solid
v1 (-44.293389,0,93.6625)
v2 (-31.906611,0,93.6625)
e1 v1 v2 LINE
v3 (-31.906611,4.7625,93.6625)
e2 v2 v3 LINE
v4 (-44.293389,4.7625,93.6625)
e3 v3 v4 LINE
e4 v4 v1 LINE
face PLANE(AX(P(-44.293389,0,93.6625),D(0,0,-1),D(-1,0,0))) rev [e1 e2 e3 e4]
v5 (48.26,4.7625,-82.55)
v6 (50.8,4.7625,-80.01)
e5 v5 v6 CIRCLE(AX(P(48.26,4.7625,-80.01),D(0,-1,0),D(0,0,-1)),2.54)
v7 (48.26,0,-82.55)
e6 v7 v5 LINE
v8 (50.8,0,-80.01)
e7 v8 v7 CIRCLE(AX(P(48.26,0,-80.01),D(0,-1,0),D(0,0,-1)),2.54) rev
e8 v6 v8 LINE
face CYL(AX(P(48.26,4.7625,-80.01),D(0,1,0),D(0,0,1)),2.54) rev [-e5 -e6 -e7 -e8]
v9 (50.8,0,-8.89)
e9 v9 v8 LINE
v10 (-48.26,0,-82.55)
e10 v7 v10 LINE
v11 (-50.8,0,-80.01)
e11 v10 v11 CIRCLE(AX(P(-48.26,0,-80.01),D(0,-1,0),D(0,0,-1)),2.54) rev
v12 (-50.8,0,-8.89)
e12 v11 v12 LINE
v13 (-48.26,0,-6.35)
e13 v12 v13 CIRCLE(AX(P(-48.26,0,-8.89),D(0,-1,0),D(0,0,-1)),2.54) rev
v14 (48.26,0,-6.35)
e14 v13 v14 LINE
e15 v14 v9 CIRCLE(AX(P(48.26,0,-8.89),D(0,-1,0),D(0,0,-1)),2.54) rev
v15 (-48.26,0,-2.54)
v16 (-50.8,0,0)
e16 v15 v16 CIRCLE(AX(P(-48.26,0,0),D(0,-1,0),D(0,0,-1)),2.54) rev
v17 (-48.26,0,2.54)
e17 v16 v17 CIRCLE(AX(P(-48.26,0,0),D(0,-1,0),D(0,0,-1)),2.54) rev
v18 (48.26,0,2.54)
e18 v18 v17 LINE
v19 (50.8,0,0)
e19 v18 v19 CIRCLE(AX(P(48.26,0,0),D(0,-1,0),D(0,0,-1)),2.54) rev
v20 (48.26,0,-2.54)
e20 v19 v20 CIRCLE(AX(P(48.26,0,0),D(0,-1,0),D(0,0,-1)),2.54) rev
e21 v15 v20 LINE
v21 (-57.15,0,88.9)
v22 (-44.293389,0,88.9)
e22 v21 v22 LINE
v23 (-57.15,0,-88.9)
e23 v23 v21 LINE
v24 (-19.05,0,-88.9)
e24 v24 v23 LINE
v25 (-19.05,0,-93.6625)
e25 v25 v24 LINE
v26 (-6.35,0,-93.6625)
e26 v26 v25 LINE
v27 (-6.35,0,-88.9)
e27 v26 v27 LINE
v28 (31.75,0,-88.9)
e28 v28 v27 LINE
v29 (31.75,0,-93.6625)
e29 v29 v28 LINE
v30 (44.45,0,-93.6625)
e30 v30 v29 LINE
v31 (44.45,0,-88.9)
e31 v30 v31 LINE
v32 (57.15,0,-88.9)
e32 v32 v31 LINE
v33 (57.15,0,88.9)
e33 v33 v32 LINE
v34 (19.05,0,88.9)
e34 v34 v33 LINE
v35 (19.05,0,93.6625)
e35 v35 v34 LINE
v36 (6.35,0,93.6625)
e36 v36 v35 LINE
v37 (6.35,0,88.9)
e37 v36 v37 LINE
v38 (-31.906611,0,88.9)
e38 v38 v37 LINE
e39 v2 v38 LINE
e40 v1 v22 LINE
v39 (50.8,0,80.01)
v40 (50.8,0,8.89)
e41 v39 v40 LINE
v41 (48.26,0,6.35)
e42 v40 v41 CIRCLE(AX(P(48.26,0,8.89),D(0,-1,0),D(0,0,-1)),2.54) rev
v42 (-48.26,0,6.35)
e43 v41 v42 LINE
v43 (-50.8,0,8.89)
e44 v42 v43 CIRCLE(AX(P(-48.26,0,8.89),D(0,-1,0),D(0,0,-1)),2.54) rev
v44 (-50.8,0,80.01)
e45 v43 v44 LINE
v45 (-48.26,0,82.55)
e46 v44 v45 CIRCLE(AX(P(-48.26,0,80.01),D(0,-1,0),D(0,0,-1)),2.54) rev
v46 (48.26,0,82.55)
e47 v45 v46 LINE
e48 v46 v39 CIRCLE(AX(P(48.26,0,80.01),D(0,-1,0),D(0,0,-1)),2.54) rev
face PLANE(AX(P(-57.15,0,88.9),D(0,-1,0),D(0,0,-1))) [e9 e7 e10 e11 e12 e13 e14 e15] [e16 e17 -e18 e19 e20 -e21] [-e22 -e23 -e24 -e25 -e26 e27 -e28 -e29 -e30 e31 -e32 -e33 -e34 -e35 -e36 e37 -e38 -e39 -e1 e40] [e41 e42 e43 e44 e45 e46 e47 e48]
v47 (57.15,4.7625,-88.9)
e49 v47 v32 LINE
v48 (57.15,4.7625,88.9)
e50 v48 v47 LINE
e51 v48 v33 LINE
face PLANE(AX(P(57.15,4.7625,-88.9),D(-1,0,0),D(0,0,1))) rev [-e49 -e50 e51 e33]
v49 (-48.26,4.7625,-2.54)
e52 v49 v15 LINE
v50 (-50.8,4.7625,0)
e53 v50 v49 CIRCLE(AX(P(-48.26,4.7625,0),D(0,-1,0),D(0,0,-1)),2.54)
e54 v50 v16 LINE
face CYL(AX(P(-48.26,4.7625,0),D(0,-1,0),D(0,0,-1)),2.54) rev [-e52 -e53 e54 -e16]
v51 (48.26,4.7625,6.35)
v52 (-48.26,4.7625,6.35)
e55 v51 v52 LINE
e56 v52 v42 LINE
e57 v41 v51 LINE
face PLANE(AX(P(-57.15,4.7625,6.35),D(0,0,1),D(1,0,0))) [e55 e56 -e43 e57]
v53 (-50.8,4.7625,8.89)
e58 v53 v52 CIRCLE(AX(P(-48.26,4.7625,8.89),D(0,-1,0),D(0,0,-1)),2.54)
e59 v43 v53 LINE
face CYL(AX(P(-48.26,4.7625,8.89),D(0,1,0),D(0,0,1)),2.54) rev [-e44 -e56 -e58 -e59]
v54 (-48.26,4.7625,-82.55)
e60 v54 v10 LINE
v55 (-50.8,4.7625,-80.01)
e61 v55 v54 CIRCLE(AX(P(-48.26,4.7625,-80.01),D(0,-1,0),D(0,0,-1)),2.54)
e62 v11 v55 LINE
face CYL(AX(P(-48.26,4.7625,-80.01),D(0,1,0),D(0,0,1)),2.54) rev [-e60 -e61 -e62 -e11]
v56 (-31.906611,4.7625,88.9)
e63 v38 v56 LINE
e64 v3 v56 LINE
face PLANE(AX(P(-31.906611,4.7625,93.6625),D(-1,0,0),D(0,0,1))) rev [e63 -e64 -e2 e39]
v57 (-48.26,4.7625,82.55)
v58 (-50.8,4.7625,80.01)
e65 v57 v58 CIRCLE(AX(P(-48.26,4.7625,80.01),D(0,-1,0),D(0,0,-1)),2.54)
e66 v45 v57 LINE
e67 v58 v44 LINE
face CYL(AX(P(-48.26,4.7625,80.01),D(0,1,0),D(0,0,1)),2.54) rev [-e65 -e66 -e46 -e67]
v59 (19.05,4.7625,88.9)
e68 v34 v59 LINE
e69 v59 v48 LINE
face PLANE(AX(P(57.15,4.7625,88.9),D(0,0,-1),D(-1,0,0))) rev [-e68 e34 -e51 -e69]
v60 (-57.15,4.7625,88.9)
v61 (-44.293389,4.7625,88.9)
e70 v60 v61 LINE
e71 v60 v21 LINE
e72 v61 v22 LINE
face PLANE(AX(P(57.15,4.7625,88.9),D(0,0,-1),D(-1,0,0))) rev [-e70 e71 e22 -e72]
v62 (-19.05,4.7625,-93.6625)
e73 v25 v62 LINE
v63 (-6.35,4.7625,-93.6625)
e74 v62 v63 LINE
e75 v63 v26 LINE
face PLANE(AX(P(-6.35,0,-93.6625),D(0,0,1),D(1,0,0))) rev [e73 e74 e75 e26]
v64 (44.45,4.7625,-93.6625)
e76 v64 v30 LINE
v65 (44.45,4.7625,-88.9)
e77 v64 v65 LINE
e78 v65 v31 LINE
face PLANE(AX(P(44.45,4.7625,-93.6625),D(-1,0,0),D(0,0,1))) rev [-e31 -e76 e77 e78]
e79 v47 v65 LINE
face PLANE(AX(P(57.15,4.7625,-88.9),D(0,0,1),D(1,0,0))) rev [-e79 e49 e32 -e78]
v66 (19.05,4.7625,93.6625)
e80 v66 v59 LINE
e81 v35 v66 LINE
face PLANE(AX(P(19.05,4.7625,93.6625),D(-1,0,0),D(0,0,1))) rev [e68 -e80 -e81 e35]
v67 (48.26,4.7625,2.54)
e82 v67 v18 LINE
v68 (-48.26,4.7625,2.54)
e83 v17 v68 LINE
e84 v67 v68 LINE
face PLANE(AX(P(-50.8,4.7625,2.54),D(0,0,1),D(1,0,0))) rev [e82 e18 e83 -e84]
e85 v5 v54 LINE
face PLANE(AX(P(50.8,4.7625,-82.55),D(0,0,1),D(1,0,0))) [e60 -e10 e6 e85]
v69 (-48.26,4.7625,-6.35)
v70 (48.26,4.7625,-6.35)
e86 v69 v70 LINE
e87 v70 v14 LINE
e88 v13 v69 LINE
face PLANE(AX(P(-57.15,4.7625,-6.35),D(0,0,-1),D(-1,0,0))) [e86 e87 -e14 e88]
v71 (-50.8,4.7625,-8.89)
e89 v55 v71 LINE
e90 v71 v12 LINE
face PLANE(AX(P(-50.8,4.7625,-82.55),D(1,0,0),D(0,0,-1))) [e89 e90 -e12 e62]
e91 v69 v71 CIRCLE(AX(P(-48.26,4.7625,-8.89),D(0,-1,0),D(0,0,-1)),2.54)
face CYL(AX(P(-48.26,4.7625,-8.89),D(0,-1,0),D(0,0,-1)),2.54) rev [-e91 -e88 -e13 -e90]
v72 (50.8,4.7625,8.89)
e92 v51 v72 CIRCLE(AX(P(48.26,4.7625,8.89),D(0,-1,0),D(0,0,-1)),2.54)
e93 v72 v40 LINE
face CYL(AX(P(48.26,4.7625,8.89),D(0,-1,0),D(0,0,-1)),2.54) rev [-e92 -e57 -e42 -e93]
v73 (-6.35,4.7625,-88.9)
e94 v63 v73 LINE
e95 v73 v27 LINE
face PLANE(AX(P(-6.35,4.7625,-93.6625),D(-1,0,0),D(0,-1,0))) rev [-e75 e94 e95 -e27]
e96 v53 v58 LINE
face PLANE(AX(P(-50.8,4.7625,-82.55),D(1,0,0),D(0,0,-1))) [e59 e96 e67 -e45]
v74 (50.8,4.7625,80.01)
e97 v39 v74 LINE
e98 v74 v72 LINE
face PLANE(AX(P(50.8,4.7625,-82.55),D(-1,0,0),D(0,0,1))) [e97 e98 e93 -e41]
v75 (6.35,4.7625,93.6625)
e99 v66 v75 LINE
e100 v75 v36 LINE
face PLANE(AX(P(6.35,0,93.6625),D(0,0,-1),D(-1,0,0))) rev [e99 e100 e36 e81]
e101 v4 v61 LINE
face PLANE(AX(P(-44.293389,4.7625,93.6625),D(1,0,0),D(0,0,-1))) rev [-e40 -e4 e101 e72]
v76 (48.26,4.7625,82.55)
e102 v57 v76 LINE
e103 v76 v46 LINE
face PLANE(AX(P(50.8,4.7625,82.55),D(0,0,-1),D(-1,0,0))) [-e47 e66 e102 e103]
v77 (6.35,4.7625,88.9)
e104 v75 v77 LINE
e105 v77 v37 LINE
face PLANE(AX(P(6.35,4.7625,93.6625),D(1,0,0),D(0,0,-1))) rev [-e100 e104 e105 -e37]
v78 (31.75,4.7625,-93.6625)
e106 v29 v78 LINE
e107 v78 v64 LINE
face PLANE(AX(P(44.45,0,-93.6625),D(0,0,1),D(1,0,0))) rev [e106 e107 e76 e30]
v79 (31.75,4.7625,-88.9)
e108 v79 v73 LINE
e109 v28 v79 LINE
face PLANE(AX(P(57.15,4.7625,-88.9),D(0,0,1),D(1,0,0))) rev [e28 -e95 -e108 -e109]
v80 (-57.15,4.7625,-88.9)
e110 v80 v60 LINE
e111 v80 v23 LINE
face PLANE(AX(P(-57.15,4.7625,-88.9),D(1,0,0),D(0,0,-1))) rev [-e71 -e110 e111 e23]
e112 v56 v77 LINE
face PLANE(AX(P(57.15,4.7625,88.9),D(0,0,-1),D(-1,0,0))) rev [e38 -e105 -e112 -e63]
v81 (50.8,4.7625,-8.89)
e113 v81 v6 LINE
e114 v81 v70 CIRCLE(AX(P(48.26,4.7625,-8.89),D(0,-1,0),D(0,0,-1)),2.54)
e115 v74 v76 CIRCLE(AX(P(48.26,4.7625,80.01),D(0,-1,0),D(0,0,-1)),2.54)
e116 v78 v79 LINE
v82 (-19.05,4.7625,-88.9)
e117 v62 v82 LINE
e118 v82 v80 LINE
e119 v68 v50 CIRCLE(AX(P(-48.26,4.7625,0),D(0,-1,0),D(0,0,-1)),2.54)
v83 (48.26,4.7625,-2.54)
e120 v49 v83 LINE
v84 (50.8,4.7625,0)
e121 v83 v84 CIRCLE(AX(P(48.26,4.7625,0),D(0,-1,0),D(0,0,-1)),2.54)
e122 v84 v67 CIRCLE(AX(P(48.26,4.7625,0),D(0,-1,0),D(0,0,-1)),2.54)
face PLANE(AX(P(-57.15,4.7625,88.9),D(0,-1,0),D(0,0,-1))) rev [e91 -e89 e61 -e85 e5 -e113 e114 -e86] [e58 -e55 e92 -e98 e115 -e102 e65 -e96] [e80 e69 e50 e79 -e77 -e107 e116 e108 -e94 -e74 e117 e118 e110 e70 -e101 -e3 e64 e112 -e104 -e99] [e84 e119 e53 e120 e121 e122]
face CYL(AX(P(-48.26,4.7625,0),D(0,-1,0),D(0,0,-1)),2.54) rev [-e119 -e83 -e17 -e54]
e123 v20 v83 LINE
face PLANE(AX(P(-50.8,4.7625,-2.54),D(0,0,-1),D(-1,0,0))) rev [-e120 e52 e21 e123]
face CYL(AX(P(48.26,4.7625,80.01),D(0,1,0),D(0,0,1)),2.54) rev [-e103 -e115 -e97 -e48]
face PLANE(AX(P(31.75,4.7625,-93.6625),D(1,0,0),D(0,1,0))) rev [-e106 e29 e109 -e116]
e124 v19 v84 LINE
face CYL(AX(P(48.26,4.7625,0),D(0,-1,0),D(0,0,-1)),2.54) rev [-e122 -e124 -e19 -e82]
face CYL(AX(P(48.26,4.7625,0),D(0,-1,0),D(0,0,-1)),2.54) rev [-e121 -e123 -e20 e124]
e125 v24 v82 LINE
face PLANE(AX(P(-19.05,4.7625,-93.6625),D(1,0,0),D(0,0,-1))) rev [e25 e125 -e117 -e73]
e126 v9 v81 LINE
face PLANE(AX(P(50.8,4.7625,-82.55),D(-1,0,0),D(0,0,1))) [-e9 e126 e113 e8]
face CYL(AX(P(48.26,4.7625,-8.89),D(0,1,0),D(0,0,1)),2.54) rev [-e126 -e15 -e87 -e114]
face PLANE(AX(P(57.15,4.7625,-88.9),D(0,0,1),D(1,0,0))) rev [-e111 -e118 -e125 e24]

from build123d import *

# Parameters (mm, degrees)
SKETCH1_W           = 114.3
SKETCH1_H           = 177.8
SKETCH1_W_2         = 101.6
SKETCH1_H_2         = 165.1
BOSS_EXTRUDE1_DEPTH = 4.7625
SKETCH2_W           = 12.38677804
SKETCH2_H           = 4.7625
SKETCH2_W_2         = 12.7
BOSS_EXTRUDE2_DEPTH = 4.7625
SKETCH3_W           = 12.7
SKETCH3_H           = 4.7625
BOSS_EXTRUDE3_DEPTH = 4.7625
FILLET1_R           = 2.54
SKETCH5_W           = 114.3
SKETCH5_H           = 12.7
SKETCH5_W_2         = 101.6
SKETCH5_H_2         = 5.08
BOSS_EXTRUDE5_DEPTH = 4.7625
FILLET3_R           = 2.54


with BuildPart() as part:
    # Sketch1 → Boss-Extrude1 (new body)
    with BuildSketch(Plane(origin=(0, 0, 0), x_dir=(1, 0, 0), z_dir=(0, 1, 0))):
        Rectangle(SKETCH1_W, SKETCH1_H)
        Rectangle(SKETCH1_W_2, SKETCH1_H_2, mode=Mode.SUBTRACT)
    extrude(amount=BOSS_EXTRUDE1_DEPTH)

    # Sketch2 → Boss-Extrude2 (add)
    with BuildSketch(Plane.XY.offset(88.9)):
        with Locations((-38.1, 2.38125)):
            Rectangle(SKETCH2_W, SKETCH2_H)
        with Locations((12.7, 2.38125)):
            Rectangle(SKETCH2_W_2, SKETCH2_H)
    extrude(amount=BOSS_EXTRUDE2_DEPTH)

    # Sketch3 → Boss-Extrude3 (add)
    with BuildSketch(Plane(origin=(0, 0, -88.9), x_dir=(-1, 0, 0), z_dir=(0, 0, -1))):
        with Locations((-38.1, 2.38125)):
            Rectangle(SKETCH3_W, SKETCH3_H)
        with Locations((12.7, 2.38125)):
            Rectangle(SKETCH3_W, SKETCH3_H)
    extrude(amount=BOSS_EXTRUDE3_DEPTH)

    # Fillet1
    fillet1_edges = [part.edges().sort_by_distance(p)[0] for p in [
        (50.8, 2.38125, 82.55),
        (50.8, 2.38125, -82.55),
        (-50.8, 2.38125, -82.55),
        (-50.8, 2.38125, 82.55),
    ]]
    fillet(fillet1_edges, radius=FILLET1_R)

    # Sketch5 → Boss-Extrude5 (add)
    with BuildSketch(Plane.XZ):
        Rectangle(SKETCH5_W, SKETCH5_H)
        Rectangle(SKETCH5_W_2, SKETCH5_H_2, mode=Mode.SUBTRACT)
    extrude(amount=-BOSS_EXTRUDE5_DEPTH)

    # Fillet3
    fillet3_edges = [part.edges().sort_by_distance(p)[0] for p in [
        (-50.8, 2.38125, 6.35),
        (-50.8, 2.38125, -6.35),
        (50.8, 2.38125, -6.35),
        (50.8, 2.38125, 6.35),
        (50.8, 2.38125, -2.54),
        (-50.8, 2.38125, -2.54),
        (-50.8, 2.38125, 2.54),
        (50.8, 2.38125, 2.54),
    ]]
    fillet(fillet3_edges, radius=FILLET3_R - 0.0001)  # a hair under: the kernel refuses the full size


solid = part.part
